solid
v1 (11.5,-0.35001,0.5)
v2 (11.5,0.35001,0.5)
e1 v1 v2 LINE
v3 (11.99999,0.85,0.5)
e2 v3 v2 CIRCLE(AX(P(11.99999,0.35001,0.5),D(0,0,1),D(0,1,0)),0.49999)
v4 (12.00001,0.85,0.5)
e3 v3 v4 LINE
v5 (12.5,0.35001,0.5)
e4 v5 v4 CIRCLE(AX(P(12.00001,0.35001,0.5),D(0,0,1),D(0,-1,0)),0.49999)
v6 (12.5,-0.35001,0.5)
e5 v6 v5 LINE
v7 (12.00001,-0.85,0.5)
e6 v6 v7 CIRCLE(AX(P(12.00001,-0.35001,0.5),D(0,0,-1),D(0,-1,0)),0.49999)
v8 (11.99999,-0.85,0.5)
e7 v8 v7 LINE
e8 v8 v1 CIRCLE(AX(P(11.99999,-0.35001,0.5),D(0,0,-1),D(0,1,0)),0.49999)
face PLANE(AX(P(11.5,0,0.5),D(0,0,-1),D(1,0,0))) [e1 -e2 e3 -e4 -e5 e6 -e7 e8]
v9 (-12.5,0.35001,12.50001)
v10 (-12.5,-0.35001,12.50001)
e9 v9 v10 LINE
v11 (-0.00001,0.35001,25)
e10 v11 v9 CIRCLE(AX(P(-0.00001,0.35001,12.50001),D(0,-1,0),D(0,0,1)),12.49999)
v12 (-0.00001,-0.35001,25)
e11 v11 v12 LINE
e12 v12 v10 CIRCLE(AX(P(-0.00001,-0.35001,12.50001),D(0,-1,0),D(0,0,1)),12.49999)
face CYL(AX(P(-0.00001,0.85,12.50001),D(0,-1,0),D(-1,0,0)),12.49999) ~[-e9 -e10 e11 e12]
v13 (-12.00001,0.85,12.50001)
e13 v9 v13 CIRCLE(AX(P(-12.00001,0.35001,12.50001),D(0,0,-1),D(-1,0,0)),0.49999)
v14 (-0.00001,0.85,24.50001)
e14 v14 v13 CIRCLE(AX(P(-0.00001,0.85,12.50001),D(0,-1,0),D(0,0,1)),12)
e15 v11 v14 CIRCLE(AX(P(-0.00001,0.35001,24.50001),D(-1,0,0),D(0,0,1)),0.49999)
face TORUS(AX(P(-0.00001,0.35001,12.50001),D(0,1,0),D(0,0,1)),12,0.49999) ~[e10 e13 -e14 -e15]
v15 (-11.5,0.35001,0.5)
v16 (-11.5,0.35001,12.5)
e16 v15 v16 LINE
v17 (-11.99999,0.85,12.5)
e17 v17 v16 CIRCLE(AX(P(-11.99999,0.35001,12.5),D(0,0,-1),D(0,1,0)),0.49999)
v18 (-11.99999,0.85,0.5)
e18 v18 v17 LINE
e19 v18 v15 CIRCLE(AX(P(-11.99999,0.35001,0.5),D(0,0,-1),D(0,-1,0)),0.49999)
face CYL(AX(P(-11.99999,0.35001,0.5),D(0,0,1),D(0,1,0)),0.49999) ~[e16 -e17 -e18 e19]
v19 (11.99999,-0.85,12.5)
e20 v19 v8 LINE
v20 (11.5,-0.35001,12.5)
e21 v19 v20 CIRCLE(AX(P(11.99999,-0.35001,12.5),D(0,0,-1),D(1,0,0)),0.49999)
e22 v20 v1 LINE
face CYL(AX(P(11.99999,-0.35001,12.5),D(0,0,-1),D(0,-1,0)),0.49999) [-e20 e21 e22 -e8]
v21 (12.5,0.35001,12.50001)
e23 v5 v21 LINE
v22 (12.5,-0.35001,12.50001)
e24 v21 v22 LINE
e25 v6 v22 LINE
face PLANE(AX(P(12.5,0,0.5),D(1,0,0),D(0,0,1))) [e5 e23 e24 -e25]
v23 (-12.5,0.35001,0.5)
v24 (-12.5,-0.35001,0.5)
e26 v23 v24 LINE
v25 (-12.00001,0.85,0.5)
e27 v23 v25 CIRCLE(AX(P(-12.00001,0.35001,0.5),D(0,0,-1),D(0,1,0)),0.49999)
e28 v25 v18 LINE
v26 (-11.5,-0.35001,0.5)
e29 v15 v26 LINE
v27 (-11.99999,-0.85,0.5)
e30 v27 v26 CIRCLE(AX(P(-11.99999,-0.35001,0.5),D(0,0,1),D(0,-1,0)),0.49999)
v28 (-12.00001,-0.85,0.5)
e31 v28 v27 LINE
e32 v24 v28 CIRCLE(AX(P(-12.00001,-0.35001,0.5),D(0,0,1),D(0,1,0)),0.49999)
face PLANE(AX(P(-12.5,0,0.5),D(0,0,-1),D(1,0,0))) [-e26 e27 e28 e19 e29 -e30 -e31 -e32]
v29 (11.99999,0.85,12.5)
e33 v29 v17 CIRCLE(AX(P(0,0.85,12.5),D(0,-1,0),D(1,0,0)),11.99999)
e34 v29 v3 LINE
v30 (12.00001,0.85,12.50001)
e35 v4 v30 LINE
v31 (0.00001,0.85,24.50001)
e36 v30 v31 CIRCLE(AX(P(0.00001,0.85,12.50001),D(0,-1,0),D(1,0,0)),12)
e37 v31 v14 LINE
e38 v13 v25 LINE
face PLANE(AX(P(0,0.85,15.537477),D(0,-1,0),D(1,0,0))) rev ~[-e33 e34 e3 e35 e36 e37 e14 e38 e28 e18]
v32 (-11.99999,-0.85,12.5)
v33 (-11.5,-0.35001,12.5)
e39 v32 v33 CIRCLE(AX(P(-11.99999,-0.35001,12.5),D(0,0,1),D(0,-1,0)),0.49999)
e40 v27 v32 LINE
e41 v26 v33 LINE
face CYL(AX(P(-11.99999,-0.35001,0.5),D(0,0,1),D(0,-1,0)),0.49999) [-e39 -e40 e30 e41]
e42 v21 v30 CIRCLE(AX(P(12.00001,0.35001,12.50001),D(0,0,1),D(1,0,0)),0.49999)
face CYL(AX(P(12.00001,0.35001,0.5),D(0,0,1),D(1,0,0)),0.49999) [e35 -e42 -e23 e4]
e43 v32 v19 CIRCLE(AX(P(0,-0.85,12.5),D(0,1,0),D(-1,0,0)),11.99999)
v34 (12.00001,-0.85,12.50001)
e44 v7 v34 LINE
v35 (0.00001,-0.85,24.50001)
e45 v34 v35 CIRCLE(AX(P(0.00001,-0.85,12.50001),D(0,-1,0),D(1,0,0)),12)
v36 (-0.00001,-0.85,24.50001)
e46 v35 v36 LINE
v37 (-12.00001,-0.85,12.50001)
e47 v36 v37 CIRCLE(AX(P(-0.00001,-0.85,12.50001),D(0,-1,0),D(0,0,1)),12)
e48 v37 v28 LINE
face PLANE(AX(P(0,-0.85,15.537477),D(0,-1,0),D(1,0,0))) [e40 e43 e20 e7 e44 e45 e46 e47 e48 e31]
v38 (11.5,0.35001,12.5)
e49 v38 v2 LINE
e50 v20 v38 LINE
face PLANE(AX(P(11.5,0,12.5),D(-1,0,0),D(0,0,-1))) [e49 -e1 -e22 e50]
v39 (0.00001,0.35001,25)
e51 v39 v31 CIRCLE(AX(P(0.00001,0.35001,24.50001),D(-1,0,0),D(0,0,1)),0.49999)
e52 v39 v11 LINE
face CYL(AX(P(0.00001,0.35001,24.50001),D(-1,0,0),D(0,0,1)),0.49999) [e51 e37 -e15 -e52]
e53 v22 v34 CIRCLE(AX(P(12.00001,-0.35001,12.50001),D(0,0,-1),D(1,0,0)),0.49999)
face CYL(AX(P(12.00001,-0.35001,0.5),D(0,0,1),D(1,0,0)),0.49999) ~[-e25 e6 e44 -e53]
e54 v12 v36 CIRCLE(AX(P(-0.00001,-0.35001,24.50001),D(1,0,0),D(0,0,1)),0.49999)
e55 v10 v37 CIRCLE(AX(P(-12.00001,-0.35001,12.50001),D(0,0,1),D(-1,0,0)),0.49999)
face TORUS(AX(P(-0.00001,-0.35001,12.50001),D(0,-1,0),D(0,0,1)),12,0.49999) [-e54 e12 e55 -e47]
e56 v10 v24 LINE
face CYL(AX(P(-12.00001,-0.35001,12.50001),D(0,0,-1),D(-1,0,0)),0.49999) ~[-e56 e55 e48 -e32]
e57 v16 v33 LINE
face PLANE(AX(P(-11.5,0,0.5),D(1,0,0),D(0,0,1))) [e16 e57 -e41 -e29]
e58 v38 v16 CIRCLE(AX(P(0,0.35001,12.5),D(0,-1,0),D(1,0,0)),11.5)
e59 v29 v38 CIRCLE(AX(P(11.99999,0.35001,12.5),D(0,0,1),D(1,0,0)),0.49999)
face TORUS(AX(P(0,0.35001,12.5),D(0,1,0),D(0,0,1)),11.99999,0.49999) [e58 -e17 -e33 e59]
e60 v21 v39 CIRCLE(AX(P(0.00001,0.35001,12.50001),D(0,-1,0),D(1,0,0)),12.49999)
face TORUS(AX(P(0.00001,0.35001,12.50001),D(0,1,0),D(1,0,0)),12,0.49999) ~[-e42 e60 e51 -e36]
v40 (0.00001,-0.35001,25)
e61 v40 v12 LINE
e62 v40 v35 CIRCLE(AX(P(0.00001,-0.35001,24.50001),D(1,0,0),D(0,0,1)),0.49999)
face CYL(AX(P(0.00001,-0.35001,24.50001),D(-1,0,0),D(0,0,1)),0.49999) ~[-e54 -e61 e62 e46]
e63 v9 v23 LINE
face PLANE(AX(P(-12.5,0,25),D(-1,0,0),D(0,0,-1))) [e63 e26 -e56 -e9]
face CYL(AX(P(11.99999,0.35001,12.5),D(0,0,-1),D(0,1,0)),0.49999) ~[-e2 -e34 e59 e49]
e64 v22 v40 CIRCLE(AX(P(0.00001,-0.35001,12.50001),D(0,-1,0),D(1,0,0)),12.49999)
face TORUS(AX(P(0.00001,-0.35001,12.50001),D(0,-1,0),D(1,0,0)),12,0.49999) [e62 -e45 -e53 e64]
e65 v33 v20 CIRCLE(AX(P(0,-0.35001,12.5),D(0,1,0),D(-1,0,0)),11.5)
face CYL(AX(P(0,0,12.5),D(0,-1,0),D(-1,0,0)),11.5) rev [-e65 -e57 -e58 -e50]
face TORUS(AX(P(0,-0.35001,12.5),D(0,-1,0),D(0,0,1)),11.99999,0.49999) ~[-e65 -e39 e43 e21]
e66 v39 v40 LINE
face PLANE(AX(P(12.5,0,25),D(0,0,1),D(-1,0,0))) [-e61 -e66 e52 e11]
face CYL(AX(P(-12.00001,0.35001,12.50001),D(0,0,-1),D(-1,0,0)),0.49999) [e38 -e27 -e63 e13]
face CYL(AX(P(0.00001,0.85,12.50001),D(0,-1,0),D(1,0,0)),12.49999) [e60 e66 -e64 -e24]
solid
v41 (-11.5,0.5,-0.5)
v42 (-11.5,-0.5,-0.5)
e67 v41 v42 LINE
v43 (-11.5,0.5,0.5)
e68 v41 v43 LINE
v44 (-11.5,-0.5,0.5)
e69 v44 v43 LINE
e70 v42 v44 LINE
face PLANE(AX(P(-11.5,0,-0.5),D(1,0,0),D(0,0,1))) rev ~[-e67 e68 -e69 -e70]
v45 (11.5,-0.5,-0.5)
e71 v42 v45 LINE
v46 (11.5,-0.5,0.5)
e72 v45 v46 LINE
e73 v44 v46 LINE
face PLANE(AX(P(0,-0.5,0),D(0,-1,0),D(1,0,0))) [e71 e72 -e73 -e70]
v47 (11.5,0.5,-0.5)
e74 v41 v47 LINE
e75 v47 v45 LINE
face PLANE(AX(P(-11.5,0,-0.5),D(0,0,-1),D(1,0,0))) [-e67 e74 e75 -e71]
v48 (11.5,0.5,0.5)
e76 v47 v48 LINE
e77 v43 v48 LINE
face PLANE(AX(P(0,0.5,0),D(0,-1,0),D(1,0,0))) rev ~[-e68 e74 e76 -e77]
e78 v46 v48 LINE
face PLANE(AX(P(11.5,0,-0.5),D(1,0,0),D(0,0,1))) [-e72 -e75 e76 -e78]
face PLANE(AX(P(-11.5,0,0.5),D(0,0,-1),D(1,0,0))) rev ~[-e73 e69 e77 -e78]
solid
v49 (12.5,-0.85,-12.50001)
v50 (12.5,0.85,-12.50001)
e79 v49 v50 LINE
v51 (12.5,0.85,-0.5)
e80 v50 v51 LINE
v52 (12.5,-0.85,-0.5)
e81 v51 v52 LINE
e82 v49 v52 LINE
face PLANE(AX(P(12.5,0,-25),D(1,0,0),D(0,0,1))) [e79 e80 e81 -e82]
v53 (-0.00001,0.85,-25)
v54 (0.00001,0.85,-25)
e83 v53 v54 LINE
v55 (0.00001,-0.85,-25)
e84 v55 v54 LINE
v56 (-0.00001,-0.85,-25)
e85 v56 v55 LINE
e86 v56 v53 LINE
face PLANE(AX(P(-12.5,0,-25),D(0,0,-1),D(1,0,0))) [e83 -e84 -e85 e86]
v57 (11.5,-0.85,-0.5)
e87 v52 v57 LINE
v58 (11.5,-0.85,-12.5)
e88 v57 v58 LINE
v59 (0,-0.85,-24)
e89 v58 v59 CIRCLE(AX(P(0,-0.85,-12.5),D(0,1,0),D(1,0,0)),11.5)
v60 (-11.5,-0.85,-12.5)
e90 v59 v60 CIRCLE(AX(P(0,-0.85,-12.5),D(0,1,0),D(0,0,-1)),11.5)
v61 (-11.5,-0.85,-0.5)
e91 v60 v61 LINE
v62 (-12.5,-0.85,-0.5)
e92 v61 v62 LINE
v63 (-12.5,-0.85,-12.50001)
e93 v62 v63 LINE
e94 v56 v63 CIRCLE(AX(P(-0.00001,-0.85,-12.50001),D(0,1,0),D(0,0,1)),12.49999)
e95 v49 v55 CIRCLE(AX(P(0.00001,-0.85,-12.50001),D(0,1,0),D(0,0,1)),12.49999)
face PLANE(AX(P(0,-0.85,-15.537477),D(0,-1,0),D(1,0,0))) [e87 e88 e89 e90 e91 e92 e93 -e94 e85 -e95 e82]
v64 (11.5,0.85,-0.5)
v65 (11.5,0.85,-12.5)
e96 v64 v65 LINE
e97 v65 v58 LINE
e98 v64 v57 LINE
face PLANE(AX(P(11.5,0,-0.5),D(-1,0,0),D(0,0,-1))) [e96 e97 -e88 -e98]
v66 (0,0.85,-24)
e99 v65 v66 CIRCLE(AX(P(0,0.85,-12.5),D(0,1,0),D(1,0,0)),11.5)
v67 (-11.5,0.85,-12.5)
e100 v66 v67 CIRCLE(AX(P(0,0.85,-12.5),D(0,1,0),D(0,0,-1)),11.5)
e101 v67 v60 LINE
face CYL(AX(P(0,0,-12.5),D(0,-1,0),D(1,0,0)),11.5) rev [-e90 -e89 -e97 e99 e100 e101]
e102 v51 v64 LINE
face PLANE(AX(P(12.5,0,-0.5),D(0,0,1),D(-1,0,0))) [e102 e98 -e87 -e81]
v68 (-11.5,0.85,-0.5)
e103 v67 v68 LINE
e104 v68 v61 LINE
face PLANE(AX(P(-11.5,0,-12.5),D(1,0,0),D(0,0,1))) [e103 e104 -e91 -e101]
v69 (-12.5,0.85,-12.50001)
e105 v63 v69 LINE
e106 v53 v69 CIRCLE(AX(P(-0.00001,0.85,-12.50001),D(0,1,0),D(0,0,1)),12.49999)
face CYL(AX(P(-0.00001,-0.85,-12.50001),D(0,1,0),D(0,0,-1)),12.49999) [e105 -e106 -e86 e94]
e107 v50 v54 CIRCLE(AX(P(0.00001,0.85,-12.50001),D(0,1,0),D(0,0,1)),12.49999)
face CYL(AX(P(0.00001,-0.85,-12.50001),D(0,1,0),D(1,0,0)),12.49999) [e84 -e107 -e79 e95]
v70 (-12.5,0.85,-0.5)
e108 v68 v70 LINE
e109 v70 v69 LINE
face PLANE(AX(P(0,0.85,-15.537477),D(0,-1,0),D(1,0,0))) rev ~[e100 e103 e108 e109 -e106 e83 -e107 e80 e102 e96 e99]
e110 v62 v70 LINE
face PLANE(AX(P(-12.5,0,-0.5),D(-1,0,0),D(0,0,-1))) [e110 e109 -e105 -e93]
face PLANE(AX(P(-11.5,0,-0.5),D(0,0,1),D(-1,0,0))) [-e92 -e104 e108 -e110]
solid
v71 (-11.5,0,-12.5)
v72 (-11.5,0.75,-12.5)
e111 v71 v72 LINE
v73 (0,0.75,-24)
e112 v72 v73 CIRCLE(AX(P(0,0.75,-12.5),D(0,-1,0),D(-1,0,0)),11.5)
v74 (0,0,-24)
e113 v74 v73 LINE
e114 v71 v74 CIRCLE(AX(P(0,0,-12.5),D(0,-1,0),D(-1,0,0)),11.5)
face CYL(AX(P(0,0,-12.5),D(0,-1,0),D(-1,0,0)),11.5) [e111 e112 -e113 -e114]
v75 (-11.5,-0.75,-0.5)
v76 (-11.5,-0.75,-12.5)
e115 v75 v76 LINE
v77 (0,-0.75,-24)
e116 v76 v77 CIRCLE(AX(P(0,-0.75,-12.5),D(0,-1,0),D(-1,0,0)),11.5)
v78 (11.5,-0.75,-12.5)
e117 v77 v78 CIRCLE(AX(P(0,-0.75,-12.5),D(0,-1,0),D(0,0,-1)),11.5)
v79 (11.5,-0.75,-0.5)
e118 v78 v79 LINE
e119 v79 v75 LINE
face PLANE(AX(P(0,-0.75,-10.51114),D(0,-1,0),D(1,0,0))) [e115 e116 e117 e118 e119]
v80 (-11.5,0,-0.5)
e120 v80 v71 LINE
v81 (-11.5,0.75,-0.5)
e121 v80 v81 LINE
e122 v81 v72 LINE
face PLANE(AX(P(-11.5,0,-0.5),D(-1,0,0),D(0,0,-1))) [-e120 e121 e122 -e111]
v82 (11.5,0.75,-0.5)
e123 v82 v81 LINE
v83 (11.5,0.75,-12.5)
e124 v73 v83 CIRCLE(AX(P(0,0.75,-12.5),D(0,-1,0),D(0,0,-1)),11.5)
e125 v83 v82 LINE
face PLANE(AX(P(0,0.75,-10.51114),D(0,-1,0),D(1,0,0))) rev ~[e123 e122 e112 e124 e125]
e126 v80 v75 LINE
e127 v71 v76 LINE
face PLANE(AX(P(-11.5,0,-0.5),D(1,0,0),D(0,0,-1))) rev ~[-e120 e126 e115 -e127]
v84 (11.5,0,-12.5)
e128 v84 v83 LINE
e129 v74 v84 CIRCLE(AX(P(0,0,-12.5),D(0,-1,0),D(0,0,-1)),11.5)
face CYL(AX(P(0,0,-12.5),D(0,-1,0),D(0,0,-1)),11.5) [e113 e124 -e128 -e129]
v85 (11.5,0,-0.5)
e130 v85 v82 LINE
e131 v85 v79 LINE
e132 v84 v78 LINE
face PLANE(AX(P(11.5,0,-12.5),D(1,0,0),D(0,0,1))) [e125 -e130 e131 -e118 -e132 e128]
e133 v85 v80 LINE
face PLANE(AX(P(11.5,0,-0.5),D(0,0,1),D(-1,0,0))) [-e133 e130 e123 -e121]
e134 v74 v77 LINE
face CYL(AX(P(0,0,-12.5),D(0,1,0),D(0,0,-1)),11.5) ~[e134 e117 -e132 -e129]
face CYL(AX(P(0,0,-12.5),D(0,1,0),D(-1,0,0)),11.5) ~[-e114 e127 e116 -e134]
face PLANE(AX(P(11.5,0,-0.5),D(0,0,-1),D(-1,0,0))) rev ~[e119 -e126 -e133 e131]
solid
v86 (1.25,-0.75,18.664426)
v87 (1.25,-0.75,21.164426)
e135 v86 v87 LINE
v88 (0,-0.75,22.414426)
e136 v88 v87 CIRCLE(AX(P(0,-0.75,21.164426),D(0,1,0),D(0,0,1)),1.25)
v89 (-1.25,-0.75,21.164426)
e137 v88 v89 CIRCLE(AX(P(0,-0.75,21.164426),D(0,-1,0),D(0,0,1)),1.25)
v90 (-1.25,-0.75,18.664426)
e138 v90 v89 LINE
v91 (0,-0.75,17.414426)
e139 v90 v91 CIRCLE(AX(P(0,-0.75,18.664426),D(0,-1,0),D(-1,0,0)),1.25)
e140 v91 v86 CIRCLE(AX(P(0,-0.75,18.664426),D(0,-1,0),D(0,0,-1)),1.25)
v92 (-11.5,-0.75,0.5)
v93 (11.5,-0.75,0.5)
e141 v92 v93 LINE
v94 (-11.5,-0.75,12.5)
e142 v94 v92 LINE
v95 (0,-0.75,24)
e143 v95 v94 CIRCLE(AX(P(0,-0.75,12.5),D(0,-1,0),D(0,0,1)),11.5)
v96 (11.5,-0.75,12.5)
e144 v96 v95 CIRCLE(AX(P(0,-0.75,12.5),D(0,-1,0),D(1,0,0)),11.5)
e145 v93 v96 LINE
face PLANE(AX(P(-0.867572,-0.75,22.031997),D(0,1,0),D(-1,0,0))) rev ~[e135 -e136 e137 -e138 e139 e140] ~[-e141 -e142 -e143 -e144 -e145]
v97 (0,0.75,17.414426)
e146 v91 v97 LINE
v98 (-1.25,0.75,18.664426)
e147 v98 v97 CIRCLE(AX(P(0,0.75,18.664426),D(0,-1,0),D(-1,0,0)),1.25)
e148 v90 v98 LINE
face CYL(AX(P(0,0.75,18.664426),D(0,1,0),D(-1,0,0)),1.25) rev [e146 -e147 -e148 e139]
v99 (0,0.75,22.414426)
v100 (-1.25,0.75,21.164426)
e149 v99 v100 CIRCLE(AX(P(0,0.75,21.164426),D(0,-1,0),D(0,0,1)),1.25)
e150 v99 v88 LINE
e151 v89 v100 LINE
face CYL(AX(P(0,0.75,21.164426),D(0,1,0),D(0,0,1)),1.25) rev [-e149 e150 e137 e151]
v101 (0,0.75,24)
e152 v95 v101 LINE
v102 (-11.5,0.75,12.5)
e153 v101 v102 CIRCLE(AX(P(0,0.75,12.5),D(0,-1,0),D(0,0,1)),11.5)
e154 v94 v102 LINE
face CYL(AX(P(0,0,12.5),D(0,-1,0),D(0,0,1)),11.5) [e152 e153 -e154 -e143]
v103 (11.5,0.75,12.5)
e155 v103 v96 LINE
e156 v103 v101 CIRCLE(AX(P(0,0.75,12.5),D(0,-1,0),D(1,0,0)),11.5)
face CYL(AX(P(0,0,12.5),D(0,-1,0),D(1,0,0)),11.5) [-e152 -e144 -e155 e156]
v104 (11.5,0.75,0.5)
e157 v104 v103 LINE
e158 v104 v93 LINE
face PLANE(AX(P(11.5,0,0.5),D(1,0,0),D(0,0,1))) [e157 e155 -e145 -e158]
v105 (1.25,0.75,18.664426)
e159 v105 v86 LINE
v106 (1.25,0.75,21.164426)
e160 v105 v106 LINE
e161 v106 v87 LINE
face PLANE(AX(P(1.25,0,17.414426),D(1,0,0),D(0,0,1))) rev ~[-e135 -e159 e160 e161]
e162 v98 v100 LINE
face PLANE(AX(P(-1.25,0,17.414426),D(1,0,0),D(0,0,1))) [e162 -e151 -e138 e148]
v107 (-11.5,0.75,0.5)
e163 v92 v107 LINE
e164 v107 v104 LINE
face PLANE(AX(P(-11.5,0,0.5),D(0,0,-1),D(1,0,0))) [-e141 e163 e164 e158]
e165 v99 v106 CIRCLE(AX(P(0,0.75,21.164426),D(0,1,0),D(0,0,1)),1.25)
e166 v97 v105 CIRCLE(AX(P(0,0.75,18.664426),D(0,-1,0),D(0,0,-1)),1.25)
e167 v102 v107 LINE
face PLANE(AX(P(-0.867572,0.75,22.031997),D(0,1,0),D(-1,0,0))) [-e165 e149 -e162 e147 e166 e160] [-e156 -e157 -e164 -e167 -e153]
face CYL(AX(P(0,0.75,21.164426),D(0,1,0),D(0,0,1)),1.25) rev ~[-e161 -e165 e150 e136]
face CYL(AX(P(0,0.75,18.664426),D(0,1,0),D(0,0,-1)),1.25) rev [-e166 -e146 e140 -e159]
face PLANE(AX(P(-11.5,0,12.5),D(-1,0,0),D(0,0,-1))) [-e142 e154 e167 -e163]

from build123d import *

# Parameters (mm, degrees)
F1_DEPTH      = 0.85
F1_DEPTH_BACK = 0.85
F2_R          = 12.49999
F2_2_R        = 12.49999
F0_W          = 23
F0_H          = 1
F3_DEPTH      = 0.5
F3_DEPTH_BACK = 0.5
F0_W_2        = 2.5
F0_H_2        = 5
F4_DEPTH      = 0.75
F4_DEPTH_BACK = 0.75
F5_T1_DEPTH   = 1.5
F6_R          = 0.49999


# Not quite as in the source:
# - a fillet or chamfer that OpenCascade refuses, or shapes differently, is made with other operations: its cross-section is extruded or revolved along the edge and cut away or added
# - a fillet or chamfer is up to 0.001 mm smaller than in the source, because OpenCascade refuses the exact size
# - a feature names something its author has since deleted; it is built from what else it names


with BuildPart() as f1:
    # F0 (on Front) → F1 (new body, two sides)
    with BuildSketch(Plane.XZ) as f1_sk:
        with BuildLine():
            Line((12.5, 0.5), (12.5, 25))
            Line((12.5, 25), (-12.5, 25))
            Line((-12.5, 25), (-12.5, 0.5))
            Line((-12.5, 0.5), (-11.5, 0.5))
            Line((-11.5, 0.5), (-11.5, 12.5))
            ThreePointArc((-11.5, 12.5), (-8.1317279836, 20.6317279836), (0, 24))
            ThreePointArc((0, 24), (8.1317279836, 20.6317279836), (11.5, 12.5))
            Line((11.5, 12.5), (11.5, 0.5))
            Line((11.5, 0.5), (12.5, 0.5))
        make_face()
    extrude(amount=F1_DEPTH)
    extrude(f1_sk.sketch, amount=-F1_DEPTH_BACK)

    # F2 (radius 12.5 in the source; OpenCascade refuses exactly that, so slightly less here)
    f2_edges = [f1.edges().sort_by_distance(p)[0] for p in [
        (12.5, 0, 25),
        (-12.5, 0, 25),
    ]]
    fillet(f2_edges, radius=F2_R)

    # F6 (radius 0.5 in the source; OpenCascade refuses exactly that, so slightly less here)
    f6_edges = [f1.edges().sort_by_distance(p)[0] for p in [
        (8.838838, -0.85, 21.338838),
        (12.5, -0.85, 6.500005),
        (12.5, 0.85, 6.500005),
        (8.838838, 0.85, 21.338838),
        (-12.5, -0.85, 6.500005),
        (-12.5, 0.85, 6.500005),
        (-11.5, -0.85, 6.5),
        (0, -0.85, 24),
        (11.5, 0.85, 6.5),
        (0, 0.85, 24),
        (-11.5, 0.85, 6.5),
        (11.5, -0.85, 6.5),
        (0, -0.85, 25),
        (-8.838838, -0.85, 21.338838),
        (0, 0.85, 25),
        (-8.838838, 0.85, 21.338838),
    ]]
    fillet(f6_edges, radius=F6_R)


with BuildPart() as f1b:
    # F0 (on Front) → F1, piece 2 (new body, two sides)
    with BuildSketch(Plane.XZ) as f1_2_sk:
        with BuildLine():
            Line((12.5, -25), (12.5, -0.5))
            Line((12.5, -0.5), (11.5, -0.5))
            Line((11.5, -0.5), (11.5, -12.5))
            ThreePointArc((11.5, -12.5), (8.1317279836, -20.6317279836), (0, -24))
            ThreePointArc((0, -24), (-8.1317279836, -20.6317279836), (-11.5, -12.5))
            Line((-11.5, -12.5), (-11.5, -0.5))
            Line((-11.5, -0.5), (-12.5, -0.5))
            Line((-12.5, -0.5), (-12.5, -25))
            Line((-12.5, -25), (12.5, -25))
        make_face()
    extrude(amount=F1_DEPTH)
    extrude(f1_2_sk.sketch, amount=-F1_DEPTH_BACK)

    # F2#2 (radius 12.5 in the source; OpenCascade refuses exactly that, so slightly less here)
    f2_2_edges = [f1b.edges().sort_by_distance(p)[0] for p in [
        (12.5, 0, -25),
        (-12.5, 0, -25),
    ]]
    fillet(f2_2_edges, radius=F2_2_R)


with BuildPart() as f3:
    # F0 (on Front) → F3 (new body, two sides)
    with BuildSketch(Plane.XZ) as f3_sk:
        Rectangle(F0_W, F0_H)
    extrude(amount=F3_DEPTH)
    extrude(f3_sk.sketch, amount=-F3_DEPTH_BACK)


with BuildPart() as f4:
    # F0 (on Front) → F4 (new body, two sides)
    with BuildSketch(Plane.XZ) as f4_sk:
        with BuildLine():
            Line((-11.5, 0.5), (11.5, 0.5))
            Line((11.5, 0.5), (11.5, 12.5))
            ThreePointArc((11.5, 12.5), (8.1317279836, 20.6317279836), (0, 24))
            ThreePointArc((0, 24), (-8.1317279836, 20.6317279836), (-11.5, 12.5))
            Line((-11.5, 12.5), (-11.5, 0.5))
        make_face()
        with Locations((0, 19.9144259095)):
            Rectangle(F0_W_2, F0_H_2, mode=Mode.SUBTRACT)
    extrude(amount=F4_DEPTH)
    extrude(f4_sk.sketch, amount=-F4_DEPTH_BACK)

    # F5: fillet of radius 1.25 on 4 edges, made by hand

    # F5_s2 → F5_t1 (join)
    with BuildSketch(Plane.XZ.offset(-0.75)):
        with BuildLine():
            ThreePointArc((0, 22.4144259095), (-0.8838834765, 22.048309386), (-1.25, 21.1644259095))
            Line((-1.25, 21.1644259095), (-1.25, 22.4144259095))
            Line((-1.25, 22.4144259095), (0, 22.4144259095))
        make_face()
        with BuildLine():
            ThreePointArc((0, 22.4144259095), (0.8838834765, 22.048309386), (1.25, 21.1644259095))
            Line((1.25, 21.1644259095), (1.25, 22.4144259095))
            Line((1.25, 22.4144259095), (0, 22.4144259095))
        make_face()
        with BuildLine():
            ThreePointArc((-1.25, 18.6644259095), (-0.8838834765, 17.780542433), (0, 17.4144259095))
            Line((0, 17.4144259095), (-1.25, 17.4144259095))
            Line((-1.25, 17.4144259095), (-1.25, 18.6644259095))
        make_face()
        with BuildLine():
            ThreePointArc((0, 17.4144259095), (0.8838834765, 17.780542433), (1.25, 18.6644259095))
            Line((1.25, 18.6644259095), (1.25, 17.4144259095))
            Line((1.25, 17.4144259095), (0, 17.4144259095))
        make_face()
    extrude(amount=F5_T1_DEPTH)


with BuildPart() as f4b:
    # F0 (on Front) → F4, piece 2 (new body, two sides)
    with BuildSketch(Plane.XZ) as f4_2_sk:
        with BuildLine():
            Line((11.5, -12.5), (11.5, -0.5))
            Line((11.5, -0.5), (-11.5, -0.5))
            Line((-11.5, -0.5), (-11.5, -12.5))
            ThreePointArc((-11.5, -12.5), (-8.1317279836, -20.6317279836), (0, -24))
            ThreePointArc((0, -24), (8.1317279836, -20.6317279836), (11.5, -12.5))
        make_face()
    extrude(amount=F4_DEPTH)
    extrude(f4_2_sk.sketch, amount=-F4_DEPTH_BACK)


solid = Compound([f1.part, f1b.part, f3.part, f4.part, f4b.part])
